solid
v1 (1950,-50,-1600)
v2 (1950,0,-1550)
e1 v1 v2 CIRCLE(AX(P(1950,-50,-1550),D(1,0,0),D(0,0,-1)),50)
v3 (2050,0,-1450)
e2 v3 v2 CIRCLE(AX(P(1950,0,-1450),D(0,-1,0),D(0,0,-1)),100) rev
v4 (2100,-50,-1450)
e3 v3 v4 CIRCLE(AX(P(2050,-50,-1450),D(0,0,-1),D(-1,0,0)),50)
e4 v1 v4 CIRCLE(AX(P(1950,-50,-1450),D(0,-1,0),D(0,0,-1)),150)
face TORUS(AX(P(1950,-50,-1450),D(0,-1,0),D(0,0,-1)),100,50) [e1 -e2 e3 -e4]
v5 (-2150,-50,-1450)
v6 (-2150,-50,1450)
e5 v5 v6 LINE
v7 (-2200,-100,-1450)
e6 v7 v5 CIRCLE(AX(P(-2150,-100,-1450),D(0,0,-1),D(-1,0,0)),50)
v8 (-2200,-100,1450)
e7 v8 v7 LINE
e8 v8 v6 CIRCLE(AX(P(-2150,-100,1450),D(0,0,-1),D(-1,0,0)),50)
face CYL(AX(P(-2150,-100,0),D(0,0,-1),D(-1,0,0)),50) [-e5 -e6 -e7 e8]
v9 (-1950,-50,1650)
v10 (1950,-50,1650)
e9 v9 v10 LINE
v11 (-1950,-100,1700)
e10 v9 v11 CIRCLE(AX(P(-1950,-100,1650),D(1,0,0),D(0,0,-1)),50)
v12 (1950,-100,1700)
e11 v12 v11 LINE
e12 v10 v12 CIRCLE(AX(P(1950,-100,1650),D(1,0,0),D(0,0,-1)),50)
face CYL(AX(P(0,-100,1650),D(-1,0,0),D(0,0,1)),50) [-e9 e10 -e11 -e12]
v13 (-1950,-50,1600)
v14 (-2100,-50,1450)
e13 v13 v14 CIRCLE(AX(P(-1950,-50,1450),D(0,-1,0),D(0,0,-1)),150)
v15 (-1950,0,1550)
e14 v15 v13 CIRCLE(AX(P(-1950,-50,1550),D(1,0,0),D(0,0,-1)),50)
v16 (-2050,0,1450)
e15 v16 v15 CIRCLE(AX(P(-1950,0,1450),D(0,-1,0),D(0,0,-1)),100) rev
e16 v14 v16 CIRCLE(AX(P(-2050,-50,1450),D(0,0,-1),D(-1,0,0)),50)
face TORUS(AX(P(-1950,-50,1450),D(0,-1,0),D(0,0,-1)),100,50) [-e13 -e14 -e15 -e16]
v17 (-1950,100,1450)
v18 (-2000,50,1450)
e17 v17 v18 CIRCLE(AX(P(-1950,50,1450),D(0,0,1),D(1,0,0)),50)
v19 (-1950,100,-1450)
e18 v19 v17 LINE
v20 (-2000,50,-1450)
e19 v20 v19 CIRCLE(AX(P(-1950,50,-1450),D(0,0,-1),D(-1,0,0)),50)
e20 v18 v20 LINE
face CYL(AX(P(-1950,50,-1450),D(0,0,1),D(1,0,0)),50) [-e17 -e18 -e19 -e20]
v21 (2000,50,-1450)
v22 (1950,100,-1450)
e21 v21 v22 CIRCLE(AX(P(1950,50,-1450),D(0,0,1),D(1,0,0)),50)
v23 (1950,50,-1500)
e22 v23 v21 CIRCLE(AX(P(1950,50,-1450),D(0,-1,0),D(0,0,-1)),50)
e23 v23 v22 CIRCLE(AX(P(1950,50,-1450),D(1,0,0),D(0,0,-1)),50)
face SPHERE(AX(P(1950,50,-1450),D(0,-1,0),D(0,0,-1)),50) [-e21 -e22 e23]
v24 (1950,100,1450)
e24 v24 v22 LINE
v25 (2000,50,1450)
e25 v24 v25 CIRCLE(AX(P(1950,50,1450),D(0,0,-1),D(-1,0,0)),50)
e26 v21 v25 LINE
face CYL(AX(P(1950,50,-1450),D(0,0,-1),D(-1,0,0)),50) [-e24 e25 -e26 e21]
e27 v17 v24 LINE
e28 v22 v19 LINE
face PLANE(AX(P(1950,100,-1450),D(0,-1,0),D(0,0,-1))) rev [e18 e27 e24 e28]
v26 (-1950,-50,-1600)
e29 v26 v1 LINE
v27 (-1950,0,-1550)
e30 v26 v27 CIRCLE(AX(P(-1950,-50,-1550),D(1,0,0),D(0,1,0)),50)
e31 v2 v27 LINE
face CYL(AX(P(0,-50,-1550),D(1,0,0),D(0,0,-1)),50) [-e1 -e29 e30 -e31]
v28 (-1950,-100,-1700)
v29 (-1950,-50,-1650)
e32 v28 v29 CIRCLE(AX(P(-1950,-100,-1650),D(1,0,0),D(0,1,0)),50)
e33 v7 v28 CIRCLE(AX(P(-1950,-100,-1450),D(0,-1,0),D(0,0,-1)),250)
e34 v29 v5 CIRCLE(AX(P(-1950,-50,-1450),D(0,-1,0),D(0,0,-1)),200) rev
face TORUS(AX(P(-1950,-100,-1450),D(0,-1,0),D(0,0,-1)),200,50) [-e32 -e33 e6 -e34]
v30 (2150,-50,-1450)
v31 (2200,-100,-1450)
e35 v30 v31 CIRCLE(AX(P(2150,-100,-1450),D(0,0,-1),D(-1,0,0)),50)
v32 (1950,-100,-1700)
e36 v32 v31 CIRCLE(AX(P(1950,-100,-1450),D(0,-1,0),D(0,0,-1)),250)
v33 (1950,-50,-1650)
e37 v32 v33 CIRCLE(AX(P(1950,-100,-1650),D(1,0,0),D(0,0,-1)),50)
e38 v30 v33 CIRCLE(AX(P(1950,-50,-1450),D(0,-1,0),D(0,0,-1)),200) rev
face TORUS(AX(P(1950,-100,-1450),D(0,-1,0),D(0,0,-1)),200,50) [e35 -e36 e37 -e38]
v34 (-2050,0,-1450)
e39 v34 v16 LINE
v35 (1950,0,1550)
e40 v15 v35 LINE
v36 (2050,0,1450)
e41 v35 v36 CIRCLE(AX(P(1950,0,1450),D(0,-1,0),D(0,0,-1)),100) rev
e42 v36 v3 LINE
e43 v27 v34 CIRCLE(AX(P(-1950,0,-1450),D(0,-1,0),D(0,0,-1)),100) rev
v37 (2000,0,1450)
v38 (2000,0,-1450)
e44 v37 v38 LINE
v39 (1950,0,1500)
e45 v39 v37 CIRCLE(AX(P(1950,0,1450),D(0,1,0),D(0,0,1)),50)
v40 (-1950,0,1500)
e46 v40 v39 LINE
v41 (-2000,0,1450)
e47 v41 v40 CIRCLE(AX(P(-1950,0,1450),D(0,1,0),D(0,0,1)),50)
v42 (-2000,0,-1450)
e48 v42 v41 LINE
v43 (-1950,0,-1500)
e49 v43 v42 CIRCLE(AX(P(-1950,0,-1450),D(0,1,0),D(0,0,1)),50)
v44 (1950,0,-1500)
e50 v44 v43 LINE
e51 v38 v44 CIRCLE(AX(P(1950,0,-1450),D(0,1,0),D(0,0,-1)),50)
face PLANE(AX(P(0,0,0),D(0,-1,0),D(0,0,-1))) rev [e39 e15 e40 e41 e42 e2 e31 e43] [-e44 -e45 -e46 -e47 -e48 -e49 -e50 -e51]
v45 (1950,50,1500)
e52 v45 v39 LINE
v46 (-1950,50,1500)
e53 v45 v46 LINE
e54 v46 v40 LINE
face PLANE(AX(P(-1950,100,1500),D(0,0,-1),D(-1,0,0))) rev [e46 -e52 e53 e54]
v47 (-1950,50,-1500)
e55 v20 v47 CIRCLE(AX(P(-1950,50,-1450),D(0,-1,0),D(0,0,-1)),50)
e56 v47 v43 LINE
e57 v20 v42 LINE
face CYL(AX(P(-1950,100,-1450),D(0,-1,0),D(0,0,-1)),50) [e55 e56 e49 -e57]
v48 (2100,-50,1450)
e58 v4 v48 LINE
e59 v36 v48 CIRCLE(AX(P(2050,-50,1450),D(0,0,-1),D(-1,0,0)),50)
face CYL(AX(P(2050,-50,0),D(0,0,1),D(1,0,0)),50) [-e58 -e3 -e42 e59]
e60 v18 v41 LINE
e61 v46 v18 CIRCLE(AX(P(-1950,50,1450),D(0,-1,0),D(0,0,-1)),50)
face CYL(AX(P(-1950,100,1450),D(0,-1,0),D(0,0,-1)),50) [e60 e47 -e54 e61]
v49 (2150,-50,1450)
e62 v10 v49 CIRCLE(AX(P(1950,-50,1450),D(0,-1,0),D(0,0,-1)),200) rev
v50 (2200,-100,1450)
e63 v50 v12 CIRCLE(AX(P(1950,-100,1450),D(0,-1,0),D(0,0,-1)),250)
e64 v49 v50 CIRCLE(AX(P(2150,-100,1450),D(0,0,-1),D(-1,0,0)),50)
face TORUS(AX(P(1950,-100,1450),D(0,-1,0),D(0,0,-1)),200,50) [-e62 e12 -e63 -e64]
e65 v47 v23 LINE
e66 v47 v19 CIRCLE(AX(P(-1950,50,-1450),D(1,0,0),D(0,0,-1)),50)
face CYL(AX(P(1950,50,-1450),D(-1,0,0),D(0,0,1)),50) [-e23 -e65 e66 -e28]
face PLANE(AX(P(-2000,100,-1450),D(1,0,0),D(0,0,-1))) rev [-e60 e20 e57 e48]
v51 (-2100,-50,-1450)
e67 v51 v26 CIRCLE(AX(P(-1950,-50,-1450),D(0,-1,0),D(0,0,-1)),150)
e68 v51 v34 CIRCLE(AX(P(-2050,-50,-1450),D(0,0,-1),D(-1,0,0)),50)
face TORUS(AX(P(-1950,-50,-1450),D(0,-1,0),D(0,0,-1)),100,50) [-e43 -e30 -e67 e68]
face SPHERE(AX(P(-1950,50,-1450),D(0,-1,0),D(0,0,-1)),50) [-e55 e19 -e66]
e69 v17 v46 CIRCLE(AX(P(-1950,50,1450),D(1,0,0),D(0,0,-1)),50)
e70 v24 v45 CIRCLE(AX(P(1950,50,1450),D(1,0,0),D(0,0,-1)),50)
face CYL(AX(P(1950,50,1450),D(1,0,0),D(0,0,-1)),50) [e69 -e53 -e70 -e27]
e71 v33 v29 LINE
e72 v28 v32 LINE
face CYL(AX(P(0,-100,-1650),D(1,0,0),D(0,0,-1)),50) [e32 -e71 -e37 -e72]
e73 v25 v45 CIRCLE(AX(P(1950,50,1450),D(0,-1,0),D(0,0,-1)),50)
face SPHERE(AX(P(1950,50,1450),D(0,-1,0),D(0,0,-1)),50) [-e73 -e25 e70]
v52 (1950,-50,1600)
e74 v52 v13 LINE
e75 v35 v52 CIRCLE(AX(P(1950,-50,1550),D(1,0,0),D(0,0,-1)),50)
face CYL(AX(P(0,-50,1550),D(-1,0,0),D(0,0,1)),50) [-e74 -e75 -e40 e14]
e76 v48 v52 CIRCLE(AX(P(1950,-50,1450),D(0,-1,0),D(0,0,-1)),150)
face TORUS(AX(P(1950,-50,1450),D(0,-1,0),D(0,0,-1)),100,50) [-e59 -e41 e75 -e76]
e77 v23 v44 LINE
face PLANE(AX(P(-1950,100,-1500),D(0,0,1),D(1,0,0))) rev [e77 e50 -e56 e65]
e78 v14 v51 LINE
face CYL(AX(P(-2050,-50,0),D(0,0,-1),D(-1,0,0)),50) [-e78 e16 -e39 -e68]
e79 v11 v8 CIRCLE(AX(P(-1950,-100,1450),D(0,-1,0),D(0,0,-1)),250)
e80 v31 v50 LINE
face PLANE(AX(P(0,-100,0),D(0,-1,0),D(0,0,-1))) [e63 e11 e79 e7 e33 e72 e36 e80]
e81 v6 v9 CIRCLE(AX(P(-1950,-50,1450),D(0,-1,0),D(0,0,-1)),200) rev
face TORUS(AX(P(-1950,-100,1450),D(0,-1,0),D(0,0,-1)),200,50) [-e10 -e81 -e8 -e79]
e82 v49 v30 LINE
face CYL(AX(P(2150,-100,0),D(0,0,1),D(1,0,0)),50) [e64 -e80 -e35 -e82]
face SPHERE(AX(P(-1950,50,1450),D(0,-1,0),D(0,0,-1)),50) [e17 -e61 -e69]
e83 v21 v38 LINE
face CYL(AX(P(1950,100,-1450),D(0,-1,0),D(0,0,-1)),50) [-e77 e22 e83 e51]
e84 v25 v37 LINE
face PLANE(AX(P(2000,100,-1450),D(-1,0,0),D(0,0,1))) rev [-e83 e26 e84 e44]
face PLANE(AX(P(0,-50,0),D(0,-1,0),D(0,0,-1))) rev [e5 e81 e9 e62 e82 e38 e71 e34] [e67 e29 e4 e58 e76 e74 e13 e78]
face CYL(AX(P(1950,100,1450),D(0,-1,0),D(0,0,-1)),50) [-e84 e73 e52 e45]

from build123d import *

# Parameters (mm, degrees)
BOSS_EXTRUDE1_DEPTH = 100
FILLET1_R           = 50
BOSS_EXTRUDE2_START = 50
BOSS_EXTRUDE2_DEPTH = 50
BOSS_EXTRUDE3_START = 50
BOSS_EXTRUDE3_DEPTH = 50
FILLET2_R           = 50


with BuildPart() as part:
    # Sketch1 → Boss-Extrude1 (new body)
    with BuildSketch(Plane(origin=(0, 0, 0), x_dir=(1, 0, 0), z_dir=(0, 1, 0))):
        with BuildLine():
            Line((-1950, 1500), (1950, 1500))
            ThreePointArc((1950, 1500), (1985.355339059, 1485.355339059), (2000, 1450))
            Line((2000, 1450), (2000, -1450))
            ThreePointArc((2000, -1450), (1985.355339059, -1485.355339059), (1950, -1500))
            Line((1950, -1500), (-1950, -1500))
            ThreePointArc((-1950, -1500), (-1985.355339059, -1485.355339059), (-2000, -1450))
            Line((-2000, -1450), (-2000, 1450))
            ThreePointArc((-2000, 1450), (-1985.355339059, 1485.355339059), (-1950, 1500))
        make_face()
    extrude(amount=BOSS_EXTRUDE1_DEPTH)

    # Fillet1
    fillet1_edges = [part.edges().sort_by_distance(p)[0] for p in [
        (-1985.355339059, 100, -1485.355339059),
        (-2000, 100, 0),
        (-1985.355339059, 100, 1485.355339059),
        (0, 100, 1500),
        (1985.355339059, 100, 1485.355339059),
        (2000, 100, 0),
        (1985.355339059, 100, -1485.355339059),
        (0, 100, -1500),
    ]]
    fillet(fillet1_edges, radius=FILLET1_R)

    # Sketch2 → Boss-Extrude2 (add)
    # profile 1 of 2: a face of its own
    with BuildSketch(Plane.XZ.offset(BOSS_EXTRUDE2_START)):
        with BuildLine():
            Line((1950, 1600), (-1950, 1600))
            ThreePointArc((-1950, 1600), (-2056.066017178, 1556.066017178), (-2100, 1450))
            Line((-2100, 1450), (-2100, -1450))
            ThreePointArc((-2100, -1450), (-2056.066017178, -1556.066017178), (-1950, -1600))
            Line((-1950, -1600), (1950, -1600))
            ThreePointArc((1950, -1600), (2056.066017178, -1556.066017178), (2100, -1450))
            Line((2100, -1450), (2100, 1450))
            ThreePointArc((2100, 1450), (2056.066017178, 1556.066017178), (1950, 1600))
        make_face()
        with BuildLine():
            ThreePointArc((1950, -1500), (1985.355339059, -1485.355339059), (2000, -1450))
            Line((2000, -1450), (2000, 1450))
            ThreePointArc((2000, 1450), (1985.355339059, 1485.355339059), (1950, 1500))
            Line((1950, 1500), (-1950, 1500))
            ThreePointArc((-1950, 1500), (-1985.355339059, 1485.355339059), (-2000, 1450))
            Line((-2000, 1450), (-2000, -1450))
            ThreePointArc((-2000, -1450), (-1985.355339059, -1485.355339059), (-1950, -1500))
            Line((-1950, -1500), (1950, -1500))
        make_face(mode=Mode.SUBTRACT)
    # profile 2 of 2: a face of its own
    with BuildSketch(Plane.XZ.offset(BOSS_EXTRUDE2_START)):
        with BuildLine():
            Line((-1950, -1500), (1950, -1500))
            ThreePointArc((1950, -1500), (1985.355339059, -1485.355339059), (2000, -1450))
            Line((2000, -1450), (2000, 1450))
            ThreePointArc((2000, 1450), (1985.355339059, 1485.355339059), (1950, 1500))
            Line((1950, 1500), (-1950, 1500))
            ThreePointArc((-1950, 1500), (-1985.355339059, 1485.355339059), (-2000, 1450))
            Line((-2000, 1450), (-2000, -1450))
            ThreePointArc((-2000, -1450), (-1985.355339059, -1485.355339059), (-1950, -1500))
        make_face()
    extrude(amount=-BOSS_EXTRUDE2_DEPTH)

    # Sketch3 → Boss-Extrude3 (add)
    # profile 1 of 2: a face of its own
    with BuildSketch(Plane.XZ.offset(50).offset(BOSS_EXTRUDE3_START)):
        with BuildLine():
            Line((1950, 1700), (-1950, 1700))
            ThreePointArc((-1950, 1700), (-2126.776695297, 1626.776695297), (-2200, 1450))
            Line((-2200, 1450), (-2200, -1450))
            ThreePointArc((-2200, -1450), (-2126.776695297, -1626.776695297), (-1950, -1700))
            Line((-1950, -1700), (1950, -1700))
            ThreePointArc((1950, -1700), (2126.776695297, -1626.776695297), (2200, -1450))
            Line((2200, -1450), (2200, 1450))
            ThreePointArc((2200, 1450), (2126.776695297, 1626.776695297), (1950, 1700))
        make_face()
        with BuildLine():
            Line((1950, 1600), (-1950, 1600))
            ThreePointArc((-1950, 1600), (-2056.066017178, 1556.066017178), (-2100, 1450))
            Line((-2100, 1450), (-2100, -1450))
            ThreePointArc((-2100, -1450), (-2056.066017178, -1556.066017178), (-1950, -1600))
            Line((-1950, -1600), (1950, -1600))
            ThreePointArc((1950, -1600), (2056.066017178, -1556.066017178), (2100, -1450))
            Line((2100, -1450), (2100, 1450))
            ThreePointArc((2100, 1450), (2056.066017178, 1556.066017178), (1950, 1600))
        make_face(mode=Mode.SUBTRACT)
    # profile 2 of 2: a face of its own
    with BuildSketch(Plane.XZ.offset(50).offset(BOSS_EXTRUDE3_START)):
        with BuildLine():
            ThreePointArc((2100, 1450), (2056.066017178, 1556.066017178), (1950, 1600))
            Line((1950, 1600), (-1950, 1600))
            ThreePointArc((-1950, 1600), (-2056.066017178, 1556.066017178), (-2100, 1450))
            Line((-2100, 1450), (-2100, -1450))
            ThreePointArc((-2100, -1450), (-2056.066017178, -1556.066017178), (-1950, -1600))
            Line((-1950, -1600), (1950, -1600))
            ThreePointArc((1950, -1600), (2056.066017178, -1556.066017178), (2100, -1450))
            Line((2100, -1450), (2100, 1450))
        make_face()
    extrude(amount=-BOSS_EXTRUDE3_DEPTH)

    # Fillet2
    fillet2_edges = [part.edges().sort_by_distance(p)[0] for p in [
        (2126.776695297, -50, -1626.776695297),
        (0, -50, -1700),
        (-2126.776695297, -50, -1626.776695297),
        (-2200, -50, 0),
        (-2126.776695297, -50, 1626.776695297),
        (0, -50, 1700),
        (2126.776695297, -50, 1626.776695297),
        (2056.066017178, 0, -1556.066017178),
        (0, 0, -1600),
        (-2056.066017178, 0, -1556.066017178),
        (-2100, 0, 0),
        (-2056.066017178, 0, 1556.066017178),
        (0, 0, 1600),
        (2056.066017178, 0, 1556.066017178),
        (2200, -50, 0),
        (2100, 0, 0),
    ]]
    fillet(fillet2_edges, radius=FILLET2_R - 0.0001)  # a hair under: the kernel refuses the full size


solid = part.part
